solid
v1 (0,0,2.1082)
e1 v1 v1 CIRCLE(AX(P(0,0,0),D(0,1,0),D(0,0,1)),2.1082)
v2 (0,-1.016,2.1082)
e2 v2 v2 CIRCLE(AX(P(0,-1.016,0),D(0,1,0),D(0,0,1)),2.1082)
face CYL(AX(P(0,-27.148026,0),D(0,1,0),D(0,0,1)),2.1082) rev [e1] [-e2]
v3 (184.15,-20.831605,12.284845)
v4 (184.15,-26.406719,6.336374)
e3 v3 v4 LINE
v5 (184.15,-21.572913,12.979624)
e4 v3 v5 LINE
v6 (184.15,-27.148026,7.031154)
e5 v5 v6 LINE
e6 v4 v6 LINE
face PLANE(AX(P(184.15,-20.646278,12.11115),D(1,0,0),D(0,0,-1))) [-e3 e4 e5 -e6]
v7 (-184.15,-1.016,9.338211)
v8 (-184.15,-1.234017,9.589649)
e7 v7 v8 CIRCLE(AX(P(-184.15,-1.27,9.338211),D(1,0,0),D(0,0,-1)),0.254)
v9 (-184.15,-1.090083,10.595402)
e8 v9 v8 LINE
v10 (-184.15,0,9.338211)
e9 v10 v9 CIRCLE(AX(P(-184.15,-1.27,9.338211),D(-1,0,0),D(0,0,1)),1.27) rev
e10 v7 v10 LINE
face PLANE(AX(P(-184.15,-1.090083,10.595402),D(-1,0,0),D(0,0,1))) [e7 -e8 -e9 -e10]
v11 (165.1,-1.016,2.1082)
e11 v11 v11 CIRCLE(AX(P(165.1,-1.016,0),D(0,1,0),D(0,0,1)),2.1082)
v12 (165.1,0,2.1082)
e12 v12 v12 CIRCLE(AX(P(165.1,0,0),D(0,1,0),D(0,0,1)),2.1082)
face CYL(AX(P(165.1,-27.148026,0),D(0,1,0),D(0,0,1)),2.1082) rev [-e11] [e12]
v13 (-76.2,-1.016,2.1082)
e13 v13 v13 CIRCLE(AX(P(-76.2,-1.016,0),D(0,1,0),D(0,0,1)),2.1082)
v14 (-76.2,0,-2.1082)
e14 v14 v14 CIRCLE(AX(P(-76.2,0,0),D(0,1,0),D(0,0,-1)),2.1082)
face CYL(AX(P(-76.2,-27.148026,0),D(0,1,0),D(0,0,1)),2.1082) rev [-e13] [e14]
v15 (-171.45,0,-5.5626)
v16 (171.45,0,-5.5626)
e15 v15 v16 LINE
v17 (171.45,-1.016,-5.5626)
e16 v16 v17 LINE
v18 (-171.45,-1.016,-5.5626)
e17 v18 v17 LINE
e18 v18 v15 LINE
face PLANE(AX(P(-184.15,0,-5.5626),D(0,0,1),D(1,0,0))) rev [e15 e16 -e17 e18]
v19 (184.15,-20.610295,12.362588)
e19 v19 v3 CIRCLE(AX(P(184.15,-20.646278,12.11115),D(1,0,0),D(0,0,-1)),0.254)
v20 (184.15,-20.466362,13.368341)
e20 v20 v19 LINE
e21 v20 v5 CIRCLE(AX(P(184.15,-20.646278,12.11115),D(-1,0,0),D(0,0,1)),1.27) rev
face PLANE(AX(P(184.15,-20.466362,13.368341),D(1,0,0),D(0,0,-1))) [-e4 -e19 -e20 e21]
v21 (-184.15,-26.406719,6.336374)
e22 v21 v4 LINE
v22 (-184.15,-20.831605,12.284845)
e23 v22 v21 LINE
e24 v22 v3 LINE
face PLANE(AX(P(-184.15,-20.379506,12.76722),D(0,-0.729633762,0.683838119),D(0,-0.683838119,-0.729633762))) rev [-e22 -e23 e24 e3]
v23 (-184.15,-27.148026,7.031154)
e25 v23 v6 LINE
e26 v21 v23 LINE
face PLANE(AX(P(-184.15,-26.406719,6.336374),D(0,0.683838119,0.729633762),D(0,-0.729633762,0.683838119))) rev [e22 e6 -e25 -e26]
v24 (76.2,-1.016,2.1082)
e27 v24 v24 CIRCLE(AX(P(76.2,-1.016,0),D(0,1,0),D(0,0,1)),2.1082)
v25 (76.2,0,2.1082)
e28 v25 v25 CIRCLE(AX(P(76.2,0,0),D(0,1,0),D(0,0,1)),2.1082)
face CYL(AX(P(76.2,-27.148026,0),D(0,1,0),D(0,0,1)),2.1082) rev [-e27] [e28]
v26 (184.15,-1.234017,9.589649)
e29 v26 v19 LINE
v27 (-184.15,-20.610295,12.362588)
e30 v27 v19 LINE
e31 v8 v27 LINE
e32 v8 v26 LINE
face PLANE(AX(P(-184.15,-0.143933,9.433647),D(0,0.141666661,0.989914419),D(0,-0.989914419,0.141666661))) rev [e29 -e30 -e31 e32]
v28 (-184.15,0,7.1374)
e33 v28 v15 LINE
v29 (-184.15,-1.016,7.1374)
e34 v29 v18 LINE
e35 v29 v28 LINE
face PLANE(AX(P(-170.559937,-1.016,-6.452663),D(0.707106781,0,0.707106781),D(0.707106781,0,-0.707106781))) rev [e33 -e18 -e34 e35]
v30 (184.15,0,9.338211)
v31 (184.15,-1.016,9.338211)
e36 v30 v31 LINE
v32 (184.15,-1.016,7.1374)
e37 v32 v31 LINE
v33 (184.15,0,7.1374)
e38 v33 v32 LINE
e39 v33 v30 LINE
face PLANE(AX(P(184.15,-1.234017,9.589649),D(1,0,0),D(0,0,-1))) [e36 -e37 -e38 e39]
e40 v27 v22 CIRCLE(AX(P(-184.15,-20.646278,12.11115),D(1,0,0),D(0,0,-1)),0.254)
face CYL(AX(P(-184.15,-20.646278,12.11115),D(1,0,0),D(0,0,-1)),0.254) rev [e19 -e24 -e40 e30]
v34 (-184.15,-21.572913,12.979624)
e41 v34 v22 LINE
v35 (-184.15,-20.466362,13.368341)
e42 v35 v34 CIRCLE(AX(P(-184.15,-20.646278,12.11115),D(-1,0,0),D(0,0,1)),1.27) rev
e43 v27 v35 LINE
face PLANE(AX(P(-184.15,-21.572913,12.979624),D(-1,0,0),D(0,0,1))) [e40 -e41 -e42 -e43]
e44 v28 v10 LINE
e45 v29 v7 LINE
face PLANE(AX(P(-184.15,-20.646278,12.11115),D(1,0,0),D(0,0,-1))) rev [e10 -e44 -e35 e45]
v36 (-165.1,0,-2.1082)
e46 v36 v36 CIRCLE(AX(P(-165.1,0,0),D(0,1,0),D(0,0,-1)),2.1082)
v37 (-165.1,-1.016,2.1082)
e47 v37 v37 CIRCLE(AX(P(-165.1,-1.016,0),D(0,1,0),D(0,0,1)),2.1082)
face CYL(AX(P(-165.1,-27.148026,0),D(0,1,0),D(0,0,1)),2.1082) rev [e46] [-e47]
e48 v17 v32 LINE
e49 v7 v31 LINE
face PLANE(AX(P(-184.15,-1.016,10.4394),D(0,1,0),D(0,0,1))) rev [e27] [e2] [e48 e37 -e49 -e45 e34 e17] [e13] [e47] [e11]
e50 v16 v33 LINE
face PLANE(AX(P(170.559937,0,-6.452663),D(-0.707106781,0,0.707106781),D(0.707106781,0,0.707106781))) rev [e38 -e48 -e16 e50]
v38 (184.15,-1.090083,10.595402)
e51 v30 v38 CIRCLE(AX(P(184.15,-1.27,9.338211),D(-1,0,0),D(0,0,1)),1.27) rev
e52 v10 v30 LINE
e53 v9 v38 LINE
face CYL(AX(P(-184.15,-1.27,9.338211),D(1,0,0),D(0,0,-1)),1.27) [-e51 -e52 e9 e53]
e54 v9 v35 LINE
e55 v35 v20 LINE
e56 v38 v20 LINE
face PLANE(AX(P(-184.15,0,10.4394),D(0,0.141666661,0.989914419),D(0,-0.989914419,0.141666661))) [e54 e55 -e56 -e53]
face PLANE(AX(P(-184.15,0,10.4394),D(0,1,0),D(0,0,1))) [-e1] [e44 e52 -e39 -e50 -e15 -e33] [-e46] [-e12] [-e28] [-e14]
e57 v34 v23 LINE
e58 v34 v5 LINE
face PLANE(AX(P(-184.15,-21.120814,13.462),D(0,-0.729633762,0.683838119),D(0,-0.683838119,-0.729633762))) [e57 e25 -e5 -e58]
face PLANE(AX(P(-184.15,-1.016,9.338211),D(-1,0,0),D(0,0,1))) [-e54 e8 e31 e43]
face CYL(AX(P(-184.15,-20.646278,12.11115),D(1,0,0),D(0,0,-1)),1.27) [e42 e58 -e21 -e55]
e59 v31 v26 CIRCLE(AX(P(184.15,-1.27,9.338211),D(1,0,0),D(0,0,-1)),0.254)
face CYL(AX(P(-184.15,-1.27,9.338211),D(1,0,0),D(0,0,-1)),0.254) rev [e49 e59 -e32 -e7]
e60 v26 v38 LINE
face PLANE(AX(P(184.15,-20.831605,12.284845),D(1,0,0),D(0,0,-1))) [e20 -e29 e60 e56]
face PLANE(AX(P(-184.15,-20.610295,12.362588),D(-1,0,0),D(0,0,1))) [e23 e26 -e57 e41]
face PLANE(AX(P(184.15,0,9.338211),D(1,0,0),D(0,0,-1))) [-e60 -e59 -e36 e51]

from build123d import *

# Parameters (mm, degrees)
BASE_FLANGE1_START = -184.15
BASE_FLANGE1_DEPTH = 368.3
SKETCH3_R          = 2.1082
CUT_EXTRUDE1_DEPTH = 187.620719687
CUT_EXTRUDE2_DEPTH = 1.016


# Read off the part's stored shape, not the designer's step: Base-Flange1
with BuildPart() as part:
    # Base-Flange1 outline → Base-Flange1 (new body)
    with BuildSketch(Plane(origin=(0, 0, 0), x_dir=(0, 0, -1), z_dir=(1, 0, 0)).offset(BASE_FLANGE1_START)):
        with BuildLine():
            ThreePointArc((-13.368341316, -20.466361674), (-13.309368584, -21.067196652), (-12.979624415, -21.57291321))
            Line((-12.979624415, -21.57291321), (-7.03115395, -27.148026465))
            Line((-7.03115395, -27.148026465), (-6.336374421, -26.406718563))
            Line((-6.336374421, -26.406718563), (-12.284844886, -20.831605308))
            ThreePointArc((-12.284844886, -20.831605308), (-12.350793719, -20.730461996), (-12.362588266, -20.610295001))
            Line((-12.362588266, -20.610295001), (-9.589648917, -1.234016668))
            ThreePointArc((-9.589648917, -1.234016668), (-9.504608121, -1.078094077), (-9.338210654, -1.016))
            Line((-9.338210654, -1.016), (5.562599869, -1.016))
            Line((5.562599869, -1.016), (5.562599869, 0))
            Line((5.562599869, 0), (-9.338210654, 0))
            ThreePointArc((-9.338210654, 0), (-10.170197987, -0.310470387), (-10.595401966, -1.090083341))
            Line((-10.595401966, -1.090083341), (-13.368341316, -20.466361674))
        make_face()
    extrude(amount=BASE_FLANGE1_DEPTH)

    # Sketch3 → Cut-Extrude1 (cut, through all)
    with BuildSketch(Plane(origin=(0, 0, 0), x_dir=(1, 0, 0), z_dir=(0, 1, 0))):
        with Locations(Location((0, 0, 0), (0, 0, 270))):
            Circle(SKETCH3_R)
        with Locations(Location((76.2, 0, 0), (0, 0, 270))):
            Circle(SKETCH3_R)
        with Locations(Location((165.1, 0, 0), (0, 0, 270))):
            Circle(SKETCH3_R)
        with Locations(Location((-165.1, 0, 0), (0, 0, 270))):
            Circle(SKETCH3_R)
        with Locations(Location((-76.2, 0, 0), (0, 0, 270))):
            Circle(SKETCH3_R)
    extrude(amount=-CUT_EXTRUDE1_DEPTH, mode=Mode.SUBTRACT)

    # Sketch4 → Cut-Extrude2 (cut)
    with BuildSketch(Plane(origin=(0, 0, 0), x_dir=(1, 0, 0), z_dir=(0, 1, 0))):
        Polygon((-170.559937336, 6.452662534), (-235.374711333, -58.362111464), (-235.374711333, 6.452662534), align=None)
        Polygon((235.374711333, 6.452662534), (170.559937336, 6.452662534), (235.374711333, -58.362111464), align=None)
    extrude(amount=-CUT_EXTRUDE2_DEPTH, mode=Mode.SUBTRACT)


solid = part.part
